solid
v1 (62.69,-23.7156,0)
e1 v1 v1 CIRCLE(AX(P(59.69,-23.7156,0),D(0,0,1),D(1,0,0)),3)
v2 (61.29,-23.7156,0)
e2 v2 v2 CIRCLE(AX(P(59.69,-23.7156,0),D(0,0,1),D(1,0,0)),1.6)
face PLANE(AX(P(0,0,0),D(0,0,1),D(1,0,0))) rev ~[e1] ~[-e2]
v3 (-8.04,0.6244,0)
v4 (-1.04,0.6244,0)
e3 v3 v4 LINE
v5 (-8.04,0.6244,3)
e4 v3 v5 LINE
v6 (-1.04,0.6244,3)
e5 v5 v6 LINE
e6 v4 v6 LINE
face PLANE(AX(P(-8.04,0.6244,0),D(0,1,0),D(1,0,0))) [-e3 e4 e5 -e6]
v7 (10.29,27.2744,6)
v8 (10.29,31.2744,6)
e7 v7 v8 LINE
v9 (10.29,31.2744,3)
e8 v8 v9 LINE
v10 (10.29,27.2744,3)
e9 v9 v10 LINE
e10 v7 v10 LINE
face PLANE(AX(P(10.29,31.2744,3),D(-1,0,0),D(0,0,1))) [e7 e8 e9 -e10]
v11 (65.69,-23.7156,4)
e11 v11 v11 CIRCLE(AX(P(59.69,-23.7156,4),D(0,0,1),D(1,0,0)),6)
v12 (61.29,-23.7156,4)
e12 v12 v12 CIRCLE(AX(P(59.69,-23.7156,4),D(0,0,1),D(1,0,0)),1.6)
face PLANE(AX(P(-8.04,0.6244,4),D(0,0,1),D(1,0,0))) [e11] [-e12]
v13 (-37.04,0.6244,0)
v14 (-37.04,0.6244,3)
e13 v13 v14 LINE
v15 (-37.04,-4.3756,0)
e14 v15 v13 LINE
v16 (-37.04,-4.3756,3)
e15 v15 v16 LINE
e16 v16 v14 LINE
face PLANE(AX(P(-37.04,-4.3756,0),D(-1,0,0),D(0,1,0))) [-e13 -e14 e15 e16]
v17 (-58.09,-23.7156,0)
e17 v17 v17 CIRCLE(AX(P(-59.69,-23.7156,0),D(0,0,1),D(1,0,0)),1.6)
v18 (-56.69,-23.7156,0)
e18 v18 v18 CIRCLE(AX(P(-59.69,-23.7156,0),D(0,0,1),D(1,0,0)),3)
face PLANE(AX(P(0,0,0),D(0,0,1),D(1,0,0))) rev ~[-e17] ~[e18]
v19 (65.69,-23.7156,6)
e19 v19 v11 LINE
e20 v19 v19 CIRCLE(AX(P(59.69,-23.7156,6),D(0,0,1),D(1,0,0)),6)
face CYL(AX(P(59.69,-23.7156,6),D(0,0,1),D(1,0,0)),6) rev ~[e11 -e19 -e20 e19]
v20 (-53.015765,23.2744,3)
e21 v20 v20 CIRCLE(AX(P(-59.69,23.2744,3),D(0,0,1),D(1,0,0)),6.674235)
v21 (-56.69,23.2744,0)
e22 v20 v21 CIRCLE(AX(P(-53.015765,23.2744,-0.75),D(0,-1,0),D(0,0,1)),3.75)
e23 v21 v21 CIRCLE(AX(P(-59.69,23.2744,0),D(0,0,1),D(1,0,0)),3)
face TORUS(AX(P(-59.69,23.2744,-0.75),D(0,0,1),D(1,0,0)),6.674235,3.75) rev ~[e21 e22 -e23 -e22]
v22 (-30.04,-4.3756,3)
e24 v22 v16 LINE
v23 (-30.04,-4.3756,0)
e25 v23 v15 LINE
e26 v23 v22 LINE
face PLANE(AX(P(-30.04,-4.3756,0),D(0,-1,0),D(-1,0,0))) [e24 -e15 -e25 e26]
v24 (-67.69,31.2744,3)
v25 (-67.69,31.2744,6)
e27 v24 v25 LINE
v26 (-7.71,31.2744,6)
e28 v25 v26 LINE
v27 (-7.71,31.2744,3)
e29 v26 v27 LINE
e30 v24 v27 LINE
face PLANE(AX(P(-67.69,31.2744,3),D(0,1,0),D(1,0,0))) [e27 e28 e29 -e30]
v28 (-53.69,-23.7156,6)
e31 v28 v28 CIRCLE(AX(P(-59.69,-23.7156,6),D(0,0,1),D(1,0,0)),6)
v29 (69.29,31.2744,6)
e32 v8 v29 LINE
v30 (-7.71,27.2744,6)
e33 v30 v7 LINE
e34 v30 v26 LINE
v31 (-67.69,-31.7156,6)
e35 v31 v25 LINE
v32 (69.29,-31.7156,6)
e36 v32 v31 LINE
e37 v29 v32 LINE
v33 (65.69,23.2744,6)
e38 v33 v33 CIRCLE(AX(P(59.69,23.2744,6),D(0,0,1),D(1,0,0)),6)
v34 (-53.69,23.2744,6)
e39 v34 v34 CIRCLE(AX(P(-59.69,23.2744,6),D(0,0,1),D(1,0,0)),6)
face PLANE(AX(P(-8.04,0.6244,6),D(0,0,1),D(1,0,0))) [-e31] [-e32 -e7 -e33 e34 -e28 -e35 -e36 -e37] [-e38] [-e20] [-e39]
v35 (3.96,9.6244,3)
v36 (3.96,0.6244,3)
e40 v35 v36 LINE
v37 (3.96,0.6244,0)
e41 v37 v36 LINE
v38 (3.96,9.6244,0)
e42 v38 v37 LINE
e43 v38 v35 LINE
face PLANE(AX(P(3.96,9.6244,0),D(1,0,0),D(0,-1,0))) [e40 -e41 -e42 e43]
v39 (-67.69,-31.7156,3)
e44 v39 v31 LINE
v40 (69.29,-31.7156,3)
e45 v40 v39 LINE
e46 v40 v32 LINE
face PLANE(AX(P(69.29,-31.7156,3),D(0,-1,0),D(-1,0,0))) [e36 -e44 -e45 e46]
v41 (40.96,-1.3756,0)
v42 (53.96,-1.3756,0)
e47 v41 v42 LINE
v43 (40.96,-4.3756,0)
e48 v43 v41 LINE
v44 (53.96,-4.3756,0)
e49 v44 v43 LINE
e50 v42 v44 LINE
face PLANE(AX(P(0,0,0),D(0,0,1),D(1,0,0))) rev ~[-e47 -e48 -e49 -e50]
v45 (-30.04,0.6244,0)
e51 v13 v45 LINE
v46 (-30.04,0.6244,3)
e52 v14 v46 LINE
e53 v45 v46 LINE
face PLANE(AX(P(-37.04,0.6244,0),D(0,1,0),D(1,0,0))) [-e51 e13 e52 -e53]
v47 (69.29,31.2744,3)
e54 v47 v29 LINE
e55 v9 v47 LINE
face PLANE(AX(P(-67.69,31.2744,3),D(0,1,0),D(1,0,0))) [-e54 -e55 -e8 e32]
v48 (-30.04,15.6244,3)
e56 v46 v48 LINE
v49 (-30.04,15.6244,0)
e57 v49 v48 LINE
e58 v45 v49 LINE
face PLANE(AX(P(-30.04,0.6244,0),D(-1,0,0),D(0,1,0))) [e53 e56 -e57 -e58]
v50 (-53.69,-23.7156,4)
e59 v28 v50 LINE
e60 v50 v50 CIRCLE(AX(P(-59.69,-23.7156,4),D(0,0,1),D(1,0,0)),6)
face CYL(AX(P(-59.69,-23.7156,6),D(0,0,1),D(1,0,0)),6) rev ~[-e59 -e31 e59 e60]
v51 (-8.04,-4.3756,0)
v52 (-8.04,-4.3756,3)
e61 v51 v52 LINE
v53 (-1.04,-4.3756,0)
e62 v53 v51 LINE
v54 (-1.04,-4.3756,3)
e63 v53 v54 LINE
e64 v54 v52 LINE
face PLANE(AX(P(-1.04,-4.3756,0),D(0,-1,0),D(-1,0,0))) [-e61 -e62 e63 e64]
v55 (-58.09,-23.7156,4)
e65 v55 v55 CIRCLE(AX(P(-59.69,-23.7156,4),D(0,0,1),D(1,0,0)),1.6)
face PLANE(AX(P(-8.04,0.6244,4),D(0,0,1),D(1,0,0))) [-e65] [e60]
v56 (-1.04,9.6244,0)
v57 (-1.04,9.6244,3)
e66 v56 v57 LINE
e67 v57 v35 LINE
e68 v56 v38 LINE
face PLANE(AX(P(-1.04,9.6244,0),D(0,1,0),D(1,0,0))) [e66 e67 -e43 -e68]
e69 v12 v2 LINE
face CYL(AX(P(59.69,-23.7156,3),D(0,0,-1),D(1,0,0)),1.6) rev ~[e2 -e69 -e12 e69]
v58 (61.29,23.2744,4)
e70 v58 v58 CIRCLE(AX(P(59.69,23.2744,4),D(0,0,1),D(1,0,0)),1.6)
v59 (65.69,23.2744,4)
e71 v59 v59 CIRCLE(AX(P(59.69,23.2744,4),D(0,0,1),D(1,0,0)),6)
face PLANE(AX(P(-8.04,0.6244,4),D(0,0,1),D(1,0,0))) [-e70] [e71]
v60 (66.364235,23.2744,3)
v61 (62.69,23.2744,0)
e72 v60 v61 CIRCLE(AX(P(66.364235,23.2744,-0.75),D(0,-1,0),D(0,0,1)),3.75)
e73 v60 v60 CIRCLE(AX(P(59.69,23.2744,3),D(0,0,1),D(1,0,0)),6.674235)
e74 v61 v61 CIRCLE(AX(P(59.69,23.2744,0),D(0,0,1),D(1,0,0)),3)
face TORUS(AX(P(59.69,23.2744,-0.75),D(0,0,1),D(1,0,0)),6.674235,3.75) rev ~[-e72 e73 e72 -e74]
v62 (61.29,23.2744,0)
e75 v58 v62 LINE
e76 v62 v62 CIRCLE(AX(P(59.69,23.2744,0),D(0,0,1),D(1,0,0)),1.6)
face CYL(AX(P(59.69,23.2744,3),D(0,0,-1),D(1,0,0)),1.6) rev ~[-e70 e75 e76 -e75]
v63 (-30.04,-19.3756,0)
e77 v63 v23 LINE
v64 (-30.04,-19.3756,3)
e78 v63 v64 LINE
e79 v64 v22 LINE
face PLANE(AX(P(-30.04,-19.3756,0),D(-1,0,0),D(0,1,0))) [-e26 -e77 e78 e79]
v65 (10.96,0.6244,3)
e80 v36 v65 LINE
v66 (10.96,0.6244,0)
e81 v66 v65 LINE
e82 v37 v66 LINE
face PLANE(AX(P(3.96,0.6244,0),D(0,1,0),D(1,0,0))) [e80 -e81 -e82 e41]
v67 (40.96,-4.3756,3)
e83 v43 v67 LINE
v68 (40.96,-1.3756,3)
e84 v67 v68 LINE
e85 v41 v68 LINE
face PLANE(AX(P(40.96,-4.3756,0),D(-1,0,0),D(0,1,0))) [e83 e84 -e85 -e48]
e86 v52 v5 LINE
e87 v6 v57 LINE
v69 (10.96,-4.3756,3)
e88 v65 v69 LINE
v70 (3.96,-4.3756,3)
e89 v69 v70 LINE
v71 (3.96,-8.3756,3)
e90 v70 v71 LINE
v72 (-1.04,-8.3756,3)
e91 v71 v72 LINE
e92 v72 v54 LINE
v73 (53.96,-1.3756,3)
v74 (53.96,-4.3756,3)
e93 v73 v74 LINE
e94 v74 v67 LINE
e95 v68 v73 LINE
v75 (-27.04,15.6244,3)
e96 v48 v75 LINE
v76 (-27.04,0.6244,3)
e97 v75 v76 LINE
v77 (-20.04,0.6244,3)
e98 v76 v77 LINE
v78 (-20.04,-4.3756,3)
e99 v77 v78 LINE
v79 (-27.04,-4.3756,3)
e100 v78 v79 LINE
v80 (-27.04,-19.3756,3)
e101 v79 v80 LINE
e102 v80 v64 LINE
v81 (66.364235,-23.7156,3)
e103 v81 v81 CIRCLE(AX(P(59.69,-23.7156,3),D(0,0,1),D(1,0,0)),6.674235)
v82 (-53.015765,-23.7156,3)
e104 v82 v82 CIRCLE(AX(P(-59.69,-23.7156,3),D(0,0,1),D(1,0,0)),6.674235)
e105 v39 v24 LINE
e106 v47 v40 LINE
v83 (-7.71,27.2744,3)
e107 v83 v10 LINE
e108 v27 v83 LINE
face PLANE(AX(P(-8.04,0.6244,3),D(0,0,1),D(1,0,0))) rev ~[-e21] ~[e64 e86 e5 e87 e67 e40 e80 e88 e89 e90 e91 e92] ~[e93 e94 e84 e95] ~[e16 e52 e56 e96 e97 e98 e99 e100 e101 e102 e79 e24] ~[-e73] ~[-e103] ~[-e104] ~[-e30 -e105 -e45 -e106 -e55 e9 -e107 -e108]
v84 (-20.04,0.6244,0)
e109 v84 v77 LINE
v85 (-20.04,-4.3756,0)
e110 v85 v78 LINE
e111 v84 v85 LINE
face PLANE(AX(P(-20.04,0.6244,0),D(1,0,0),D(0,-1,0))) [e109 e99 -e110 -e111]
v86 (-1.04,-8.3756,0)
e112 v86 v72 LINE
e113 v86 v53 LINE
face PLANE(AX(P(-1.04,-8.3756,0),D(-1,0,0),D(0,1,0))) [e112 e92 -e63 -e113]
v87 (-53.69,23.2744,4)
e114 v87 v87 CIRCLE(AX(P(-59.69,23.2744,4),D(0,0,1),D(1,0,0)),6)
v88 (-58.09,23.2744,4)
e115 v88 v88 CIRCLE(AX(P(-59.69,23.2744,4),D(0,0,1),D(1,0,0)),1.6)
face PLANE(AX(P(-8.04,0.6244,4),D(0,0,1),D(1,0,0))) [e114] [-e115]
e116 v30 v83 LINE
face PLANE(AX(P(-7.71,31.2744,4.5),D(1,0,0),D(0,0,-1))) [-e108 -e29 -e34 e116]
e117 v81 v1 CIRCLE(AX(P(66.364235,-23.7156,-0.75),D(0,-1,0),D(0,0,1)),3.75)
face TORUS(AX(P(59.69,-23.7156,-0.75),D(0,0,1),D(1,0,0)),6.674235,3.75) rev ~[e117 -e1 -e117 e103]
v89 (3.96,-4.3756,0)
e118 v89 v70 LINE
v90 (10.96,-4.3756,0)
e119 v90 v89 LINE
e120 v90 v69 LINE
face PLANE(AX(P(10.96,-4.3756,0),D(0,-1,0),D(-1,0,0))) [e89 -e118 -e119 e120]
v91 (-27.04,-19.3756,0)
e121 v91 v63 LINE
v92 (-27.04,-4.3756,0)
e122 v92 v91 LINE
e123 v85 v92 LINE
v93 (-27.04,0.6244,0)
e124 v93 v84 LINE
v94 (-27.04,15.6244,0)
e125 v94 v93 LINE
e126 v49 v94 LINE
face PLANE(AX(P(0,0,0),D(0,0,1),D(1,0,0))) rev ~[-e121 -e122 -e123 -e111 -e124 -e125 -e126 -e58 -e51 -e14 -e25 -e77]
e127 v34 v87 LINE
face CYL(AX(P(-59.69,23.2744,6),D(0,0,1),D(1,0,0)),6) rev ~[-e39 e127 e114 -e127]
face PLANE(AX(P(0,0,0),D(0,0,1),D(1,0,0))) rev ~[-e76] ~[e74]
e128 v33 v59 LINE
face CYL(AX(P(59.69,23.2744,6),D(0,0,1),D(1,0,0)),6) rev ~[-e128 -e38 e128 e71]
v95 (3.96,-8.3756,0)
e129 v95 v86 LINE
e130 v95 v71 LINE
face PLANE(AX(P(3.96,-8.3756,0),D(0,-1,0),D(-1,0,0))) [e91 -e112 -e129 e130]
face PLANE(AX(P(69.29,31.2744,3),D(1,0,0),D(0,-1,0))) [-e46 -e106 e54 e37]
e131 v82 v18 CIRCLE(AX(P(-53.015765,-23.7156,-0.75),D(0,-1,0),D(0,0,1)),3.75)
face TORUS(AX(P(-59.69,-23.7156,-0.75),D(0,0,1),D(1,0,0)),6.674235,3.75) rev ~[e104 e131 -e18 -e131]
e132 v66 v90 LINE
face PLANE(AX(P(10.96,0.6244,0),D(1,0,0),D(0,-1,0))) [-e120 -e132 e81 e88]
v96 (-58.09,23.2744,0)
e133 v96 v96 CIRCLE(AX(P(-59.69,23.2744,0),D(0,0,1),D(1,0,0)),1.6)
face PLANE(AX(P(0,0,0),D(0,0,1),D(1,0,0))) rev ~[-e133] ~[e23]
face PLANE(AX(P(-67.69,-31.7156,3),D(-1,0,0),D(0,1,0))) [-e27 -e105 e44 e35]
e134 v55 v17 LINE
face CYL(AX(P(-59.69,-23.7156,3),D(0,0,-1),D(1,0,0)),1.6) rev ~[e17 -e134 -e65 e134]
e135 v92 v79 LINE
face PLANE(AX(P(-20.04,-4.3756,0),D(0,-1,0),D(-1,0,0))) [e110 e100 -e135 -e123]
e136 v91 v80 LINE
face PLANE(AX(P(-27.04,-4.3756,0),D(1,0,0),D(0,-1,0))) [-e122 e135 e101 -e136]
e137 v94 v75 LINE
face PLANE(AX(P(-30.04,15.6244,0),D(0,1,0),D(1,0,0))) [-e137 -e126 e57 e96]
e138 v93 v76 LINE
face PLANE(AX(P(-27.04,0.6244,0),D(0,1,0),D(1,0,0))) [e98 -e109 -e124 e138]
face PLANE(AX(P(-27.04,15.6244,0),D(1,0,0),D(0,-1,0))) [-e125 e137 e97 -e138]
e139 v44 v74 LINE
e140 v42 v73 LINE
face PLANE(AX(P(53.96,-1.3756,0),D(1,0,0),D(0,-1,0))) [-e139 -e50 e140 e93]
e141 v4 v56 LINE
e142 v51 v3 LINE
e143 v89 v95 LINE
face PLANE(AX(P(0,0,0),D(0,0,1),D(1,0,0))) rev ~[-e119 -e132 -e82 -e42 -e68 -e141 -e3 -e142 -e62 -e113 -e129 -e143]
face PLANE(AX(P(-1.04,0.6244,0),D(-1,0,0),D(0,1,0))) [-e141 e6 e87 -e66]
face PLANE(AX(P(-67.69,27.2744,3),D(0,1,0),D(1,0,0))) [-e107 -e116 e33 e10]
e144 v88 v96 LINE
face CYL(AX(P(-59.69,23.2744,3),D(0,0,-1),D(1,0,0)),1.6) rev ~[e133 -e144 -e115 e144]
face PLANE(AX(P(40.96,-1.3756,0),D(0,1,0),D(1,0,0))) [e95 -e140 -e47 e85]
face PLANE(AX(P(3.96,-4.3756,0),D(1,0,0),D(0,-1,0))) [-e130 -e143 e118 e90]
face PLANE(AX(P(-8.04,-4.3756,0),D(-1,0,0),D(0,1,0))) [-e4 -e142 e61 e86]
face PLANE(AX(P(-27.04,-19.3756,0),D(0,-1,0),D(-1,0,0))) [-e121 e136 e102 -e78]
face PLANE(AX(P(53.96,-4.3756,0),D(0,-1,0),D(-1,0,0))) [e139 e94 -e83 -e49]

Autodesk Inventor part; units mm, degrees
ref_plane "YZ Plane" through (0, 0, 0) normal (1, 0, 0) x (0, 1, 0)
ref_plane "XZ Plane" through (0, 0, 0) normal (0, 1, 0) x (-1, 0, 0)
ref_plane "XY Plane" through (0, 0, 0) normal (0, 0, 1) x (1, 0, 0)
ref_plane "Arbeitsebene1" through (0, 0, 0) normal (0, 0, 1) x (1, 0, 0)
sketch "Skizze1" plane through (0, 0, 0) normal (0, 0, 1) x (1, 0, 0)
  circle A0 centre (-59.69, 23.2744) radius 1.6 projected
  circle A1 centre (59.69, 23.2744) radius 1.6 projected
  circle A2 centre (59.69, -23.7156) radius 1.6 projected
  circle A3 centre (-59.69, -23.7156) radius 1.6 projected
  circle A4 centre (-59.69, 23.2744) radius 3
  circle A5 centre (59.69, 23.2744) radius 3
  circle A6 centre (59.69, -23.7156) radius 3
  circle A7 centre (-59.69, -23.7156) radius 3
  point P0 (0, 0)
  dimension "d0" = 6
  dimension "d1" = 6
  dimension "d2" = 6
  dimension "d3" = 6
extrude "Extrusion1" add sketch "Skizze1" along normal blind 3
ref_plane "Arbeitsebene2" through (0, 0, 0) normal (0, 0, 1) x (1, 0, 0)
sketch "Skizze2" plane through (0, 0, 0) normal (0, 0, 1) x (1, 0, 0)
  line L0 (-30.04, 15.6244) -> (-27.04, 15.6244)
  line L1 (-27.04, -19.3756) -> (-30.04, -19.3756)
  line L2 (-20.04, 0.6244) -> (-20.04, -4.3756)
  line L3 (-37.04, -4.3756) -> (-37.04, 0.6244)
  line L4 (-1.04, 9.6244) -> (3.96, 9.6244)
  line L5 (3.96, -8.3756) -> (-1.04, -8.3756)
  line L6 (10.96, 0.6244) -> (10.96, -4.3756)
  line L7 (-8.04, -4.3756) -> (-8.04, 0.6244)
  line L8 (40.96, -1.3756) -> (53.96, -1.3756)
  line L9 (53.96, -1.3756) -> (53.96, -4.3756)
  line L10 (53.96, -4.3756) -> (40.96, -4.3756)
  line L11 (40.96, -4.3756) -> (40.96, -1.3756)
  line L12 (-8.04, 0.6244) -> (-1.04, 0.6244)
  line L13 (3.96, 0.6244) -> (10.96, 0.6244)
  line L14 (3.96, 9.6244) -> (3.96, 0.6244)
  line L15 (3.96, -4.3756) -> (3.96, -8.3756)
  line L16 (10.96, -4.3756) -> (3.96, -4.3756)
  line L17 (-1.04, -4.3756) -> (-8.04, -4.3756)
  line L18 (-1.04, -8.3756) -> (-1.04, -4.3756)
  line L19 (-1.04, 0.6244) -> (-1.04, 9.6244)
  line L20 (-37.04, 0.6244) -> (-30.04, 0.6244)
  line L21 (-27.04, 0.6244) -> (-20.04, 0.6244)
  line L22 (-27.04, 15.6244) -> (-27.04, 0.6244)
  line L23 (-27.04, -4.3756) -> (-27.04, -19.3756)
  line L24 (-30.04, -19.3756) -> (-30.04, -4.3756)
  line L25 (-30.04, 0.6244) -> (-30.04, 15.6244)
  line L26 (-20.04, -4.3756) -> (-27.04, -4.3756)
  line L27 (-30.04, -4.3756) -> (-37.04, -4.3756)
  line L28 (-66.04, -24.3506) -> (-66.04, 23.2744) projected
  line L29 (-59.69, 29.6244) -> (59.69, 29.6244) projected
  point P0 (0, 0)
  dimension "d6" = 3
  dimension "d7" = 7
  dimension "d8" = 7
  dimension "d9" = 7
  dimension "d10" = 7
  dimension "d11" = 3
  dimension "d12" = 15
  dimension "d13" = 15
  dimension "d14" = 15
  dimension "d15" = 15
  dimension "d16" = 5
  dimension "d17" = 29
  dimension "d18" = 14
  dimension "d19" = 20
  dimension "d20" = 18
  dimension "d21" = 7
  dimension "d22" = 7
  dimension "d23" = 12
  dimension "d24" = 5
  dimension "d25" = 13
  dimension "d26" = 30
  dimension "d27" = 31
extrude "Extrusion2" add sketch "Skizze2" along normal up to surface (3 mm away)
sketch "Skizze3" plane through (-8.04, 0.6244, 3) normal (0, 0, 1) x (1, 0, 0)
  line L0 (-59.65, 30.65) -> (77.33, 30.65)
  line L1 (77.33, 30.65) -> (77.33, -32.34)
  line L2 (77.33, -32.34) -> (-59.65, -32.34)
  line L3 (-59.65, -32.34) -> (-59.65, 30.65)
  circle A0 centre (67.73, 22.65) radius 1.6 projected
  circle A1 centre (-51.65, 22.65) radius 1.6 projected
  circle A2 centre (-51.65, -24.34) radius 1.6 projected
  circle A3 centre (67.73, -24.34) radius 1.6 projected
  point P0 (8.04, -0.6244)
  dimension "d31" = 8
  dimension "d32" = 8
  dimension "d33" = 8
  dimension "d34" = 8
extrude "Extrusion3" add sketch "Skizze3" along normal blind 3
fillet "Rundung1" radius 3.75 4 edges at (-62.69, -23.7156, 3) (56.69, -23.7156, 3) (56.69, 23.2744, 3) (-62.69, 23.2744, 3)
sketch "Skizze5" plane through (-8.04, 0.6244, 6) normal (0, 0, 1) x (1, 0, 0)
  circle A0 centre (67.73, 22.65) radius 1.6 projected
  circle A1 centre (67.73, 22.65) radius 6
  circle A2 centre (67.73, -24.34) radius 6
  circle A3 centre (-51.65, 22.65) radius 1.6 projected
  circle A4 centre (-51.65, 22.65) radius 6
  circle A5 centre (-51.65, -24.34) radius 6
  circle A6 centre (-51.65, -24.34) radius 1.6 projected
  circle A7 centre (67.73, -24.34) radius 1.6 projected
  point P0 (8.04, -0.6244)
  dimension "d44" = 12
  dimension "d45" = 12
  dimension "d46" = 12
  dimension "d47" = 12
extrude "Extrusion5" cut sketch "Skizze5" against normal blind 2
sketch "Skizze6" plane through (-67.69, 31.2744, 3) normal (0, 1, 0) x (1, 0, 0)
  line L0 (0, 0) -> (136.98, 0) projected
  line L1 (59.98, 0) -> (77.98, 0)
  line L2 (77.98, 0) -> (77.98, -1.5)
  line L3 (77.98, -1.5) -> (59.98, -1.5)
  line L4 (59.98, -1.5) -> (59.98, 0)
  line L5 (136.98, 0) -> (136.98, -3) projected
  point P0 (67.69, 3)
  dimension "d50" = 1.5
  dimension "d51" = 18
  dimension "d52" = 59
extrude "Extrusion6" cut sketch "Skizze6" against normal blind 4
move faces "Verschieben1" translate (0, 0, 2.5) faces at (4.29, 29.9411, 4.5)
sketch "Skizze7" plane through (-8.04, 0.6244, 6) normal (0, 0, 1) x (1, 0, 0)
  line L0 (-59.65, 30.65) -> (-59.65, -32.34) projected
  line L1 (-59.65, -32.34) -> (77.33, -32.34) projected
  line L2 (0.33, 30.65) -> (-59.65, 30.65) projected
  line L3 (77.33, -32.34) -> (77.33, 30.65) projected
  line L4 (77.33, 30.65) -> (18.33, 30.65) projected
  line L5 (-54.65, -32.34) -> (72.33, -32.34)
  line L6 (77.33, -27.34) -> (77.33, 25.65)
  line L7 (-59.65, 25.65) -> (-59.65, -27.34)
  line L8 (0.33, 26.65) -> (18.33, 26.65) projected
  line L9 (18.33, 30.65) -> (18.33, 26.65)
  line L10 (18.33, 26.65) -> (0.33, 26.65)
  line L11 (0.33, 26.65) -> (0.33, 30.65)
  line L12 (72.33, 30.65) -> (18.33, 30.65)
  line L13 (0.33, 30.65) -> (-54.65, 30.65)
  line L14 (0.33, 30.65) -> (0.33, 26.65) projected
  arc A0 (-59.65, -27.34) -> (-54.65, -32.34) centre (-54.65, -27.34) ccw
  arc A1 (-54.65, 30.65) -> (-59.65, 25.65) centre (-54.65, 25.65) ccw
  arc A2 (72.33, -32.34) -> (77.33, -27.34) centre (72.33, -27.34) ccw
  arc A3 (77.33, 25.65) -> (72.33, 30.65) centre (72.33, 25.65) ccw
  line L15 (-59.65, -27.34) -> (-59.65, -32.34)
  line L16 (-59.65, -32.34) -> (-54.65, -32.34)
  line L17 (-59.65, 30.65) -> (0.33, 30.65) projected
  line L18 (-59.65, 30.65) -> (-54.65, 30.65)
  line L19 (-59.65, 30.65) -> (-59.65, 25.65)
  line L20 (77.33, 30.65) -> (77.33, -32.34) projected
  line L21 (72.33, -32.34) -> (77.33, -32.34)
  line L22 (77.33, -32.34) -> (77.33, -27.34)
  line L23 (77.33, 25.65) -> (77.33, 30.65)
  line L24 (72.33, 30.65) -> (77.33, 30.65)
  point P0 (8.04, -0.6244)
  dimension "d58" = 4
  dimension "d59" = 4
  dimension "d60" = 5
equation "\"d1\" = d0"
equation "\"d2\" = d0"
equation "\"d3\" = d0"
equation "\"d7\" = d8"
equation "\"d9\" = d8"
equation "\"d10\" = d7"
equation "\"d14\" = d12"
equation "\"d15\" = d13"
equation "\"d21\" = d7"
equation "\"d22\" = d7"
equation "\"d32\" = d31"
equation "\"d33\" = d32"
equation "\"d34\" = d33"
equation "\"d45\" = d44"
equation "\"d46\" = d44"
equation "\"d47\" = d46"
properties part number "case_bot"
